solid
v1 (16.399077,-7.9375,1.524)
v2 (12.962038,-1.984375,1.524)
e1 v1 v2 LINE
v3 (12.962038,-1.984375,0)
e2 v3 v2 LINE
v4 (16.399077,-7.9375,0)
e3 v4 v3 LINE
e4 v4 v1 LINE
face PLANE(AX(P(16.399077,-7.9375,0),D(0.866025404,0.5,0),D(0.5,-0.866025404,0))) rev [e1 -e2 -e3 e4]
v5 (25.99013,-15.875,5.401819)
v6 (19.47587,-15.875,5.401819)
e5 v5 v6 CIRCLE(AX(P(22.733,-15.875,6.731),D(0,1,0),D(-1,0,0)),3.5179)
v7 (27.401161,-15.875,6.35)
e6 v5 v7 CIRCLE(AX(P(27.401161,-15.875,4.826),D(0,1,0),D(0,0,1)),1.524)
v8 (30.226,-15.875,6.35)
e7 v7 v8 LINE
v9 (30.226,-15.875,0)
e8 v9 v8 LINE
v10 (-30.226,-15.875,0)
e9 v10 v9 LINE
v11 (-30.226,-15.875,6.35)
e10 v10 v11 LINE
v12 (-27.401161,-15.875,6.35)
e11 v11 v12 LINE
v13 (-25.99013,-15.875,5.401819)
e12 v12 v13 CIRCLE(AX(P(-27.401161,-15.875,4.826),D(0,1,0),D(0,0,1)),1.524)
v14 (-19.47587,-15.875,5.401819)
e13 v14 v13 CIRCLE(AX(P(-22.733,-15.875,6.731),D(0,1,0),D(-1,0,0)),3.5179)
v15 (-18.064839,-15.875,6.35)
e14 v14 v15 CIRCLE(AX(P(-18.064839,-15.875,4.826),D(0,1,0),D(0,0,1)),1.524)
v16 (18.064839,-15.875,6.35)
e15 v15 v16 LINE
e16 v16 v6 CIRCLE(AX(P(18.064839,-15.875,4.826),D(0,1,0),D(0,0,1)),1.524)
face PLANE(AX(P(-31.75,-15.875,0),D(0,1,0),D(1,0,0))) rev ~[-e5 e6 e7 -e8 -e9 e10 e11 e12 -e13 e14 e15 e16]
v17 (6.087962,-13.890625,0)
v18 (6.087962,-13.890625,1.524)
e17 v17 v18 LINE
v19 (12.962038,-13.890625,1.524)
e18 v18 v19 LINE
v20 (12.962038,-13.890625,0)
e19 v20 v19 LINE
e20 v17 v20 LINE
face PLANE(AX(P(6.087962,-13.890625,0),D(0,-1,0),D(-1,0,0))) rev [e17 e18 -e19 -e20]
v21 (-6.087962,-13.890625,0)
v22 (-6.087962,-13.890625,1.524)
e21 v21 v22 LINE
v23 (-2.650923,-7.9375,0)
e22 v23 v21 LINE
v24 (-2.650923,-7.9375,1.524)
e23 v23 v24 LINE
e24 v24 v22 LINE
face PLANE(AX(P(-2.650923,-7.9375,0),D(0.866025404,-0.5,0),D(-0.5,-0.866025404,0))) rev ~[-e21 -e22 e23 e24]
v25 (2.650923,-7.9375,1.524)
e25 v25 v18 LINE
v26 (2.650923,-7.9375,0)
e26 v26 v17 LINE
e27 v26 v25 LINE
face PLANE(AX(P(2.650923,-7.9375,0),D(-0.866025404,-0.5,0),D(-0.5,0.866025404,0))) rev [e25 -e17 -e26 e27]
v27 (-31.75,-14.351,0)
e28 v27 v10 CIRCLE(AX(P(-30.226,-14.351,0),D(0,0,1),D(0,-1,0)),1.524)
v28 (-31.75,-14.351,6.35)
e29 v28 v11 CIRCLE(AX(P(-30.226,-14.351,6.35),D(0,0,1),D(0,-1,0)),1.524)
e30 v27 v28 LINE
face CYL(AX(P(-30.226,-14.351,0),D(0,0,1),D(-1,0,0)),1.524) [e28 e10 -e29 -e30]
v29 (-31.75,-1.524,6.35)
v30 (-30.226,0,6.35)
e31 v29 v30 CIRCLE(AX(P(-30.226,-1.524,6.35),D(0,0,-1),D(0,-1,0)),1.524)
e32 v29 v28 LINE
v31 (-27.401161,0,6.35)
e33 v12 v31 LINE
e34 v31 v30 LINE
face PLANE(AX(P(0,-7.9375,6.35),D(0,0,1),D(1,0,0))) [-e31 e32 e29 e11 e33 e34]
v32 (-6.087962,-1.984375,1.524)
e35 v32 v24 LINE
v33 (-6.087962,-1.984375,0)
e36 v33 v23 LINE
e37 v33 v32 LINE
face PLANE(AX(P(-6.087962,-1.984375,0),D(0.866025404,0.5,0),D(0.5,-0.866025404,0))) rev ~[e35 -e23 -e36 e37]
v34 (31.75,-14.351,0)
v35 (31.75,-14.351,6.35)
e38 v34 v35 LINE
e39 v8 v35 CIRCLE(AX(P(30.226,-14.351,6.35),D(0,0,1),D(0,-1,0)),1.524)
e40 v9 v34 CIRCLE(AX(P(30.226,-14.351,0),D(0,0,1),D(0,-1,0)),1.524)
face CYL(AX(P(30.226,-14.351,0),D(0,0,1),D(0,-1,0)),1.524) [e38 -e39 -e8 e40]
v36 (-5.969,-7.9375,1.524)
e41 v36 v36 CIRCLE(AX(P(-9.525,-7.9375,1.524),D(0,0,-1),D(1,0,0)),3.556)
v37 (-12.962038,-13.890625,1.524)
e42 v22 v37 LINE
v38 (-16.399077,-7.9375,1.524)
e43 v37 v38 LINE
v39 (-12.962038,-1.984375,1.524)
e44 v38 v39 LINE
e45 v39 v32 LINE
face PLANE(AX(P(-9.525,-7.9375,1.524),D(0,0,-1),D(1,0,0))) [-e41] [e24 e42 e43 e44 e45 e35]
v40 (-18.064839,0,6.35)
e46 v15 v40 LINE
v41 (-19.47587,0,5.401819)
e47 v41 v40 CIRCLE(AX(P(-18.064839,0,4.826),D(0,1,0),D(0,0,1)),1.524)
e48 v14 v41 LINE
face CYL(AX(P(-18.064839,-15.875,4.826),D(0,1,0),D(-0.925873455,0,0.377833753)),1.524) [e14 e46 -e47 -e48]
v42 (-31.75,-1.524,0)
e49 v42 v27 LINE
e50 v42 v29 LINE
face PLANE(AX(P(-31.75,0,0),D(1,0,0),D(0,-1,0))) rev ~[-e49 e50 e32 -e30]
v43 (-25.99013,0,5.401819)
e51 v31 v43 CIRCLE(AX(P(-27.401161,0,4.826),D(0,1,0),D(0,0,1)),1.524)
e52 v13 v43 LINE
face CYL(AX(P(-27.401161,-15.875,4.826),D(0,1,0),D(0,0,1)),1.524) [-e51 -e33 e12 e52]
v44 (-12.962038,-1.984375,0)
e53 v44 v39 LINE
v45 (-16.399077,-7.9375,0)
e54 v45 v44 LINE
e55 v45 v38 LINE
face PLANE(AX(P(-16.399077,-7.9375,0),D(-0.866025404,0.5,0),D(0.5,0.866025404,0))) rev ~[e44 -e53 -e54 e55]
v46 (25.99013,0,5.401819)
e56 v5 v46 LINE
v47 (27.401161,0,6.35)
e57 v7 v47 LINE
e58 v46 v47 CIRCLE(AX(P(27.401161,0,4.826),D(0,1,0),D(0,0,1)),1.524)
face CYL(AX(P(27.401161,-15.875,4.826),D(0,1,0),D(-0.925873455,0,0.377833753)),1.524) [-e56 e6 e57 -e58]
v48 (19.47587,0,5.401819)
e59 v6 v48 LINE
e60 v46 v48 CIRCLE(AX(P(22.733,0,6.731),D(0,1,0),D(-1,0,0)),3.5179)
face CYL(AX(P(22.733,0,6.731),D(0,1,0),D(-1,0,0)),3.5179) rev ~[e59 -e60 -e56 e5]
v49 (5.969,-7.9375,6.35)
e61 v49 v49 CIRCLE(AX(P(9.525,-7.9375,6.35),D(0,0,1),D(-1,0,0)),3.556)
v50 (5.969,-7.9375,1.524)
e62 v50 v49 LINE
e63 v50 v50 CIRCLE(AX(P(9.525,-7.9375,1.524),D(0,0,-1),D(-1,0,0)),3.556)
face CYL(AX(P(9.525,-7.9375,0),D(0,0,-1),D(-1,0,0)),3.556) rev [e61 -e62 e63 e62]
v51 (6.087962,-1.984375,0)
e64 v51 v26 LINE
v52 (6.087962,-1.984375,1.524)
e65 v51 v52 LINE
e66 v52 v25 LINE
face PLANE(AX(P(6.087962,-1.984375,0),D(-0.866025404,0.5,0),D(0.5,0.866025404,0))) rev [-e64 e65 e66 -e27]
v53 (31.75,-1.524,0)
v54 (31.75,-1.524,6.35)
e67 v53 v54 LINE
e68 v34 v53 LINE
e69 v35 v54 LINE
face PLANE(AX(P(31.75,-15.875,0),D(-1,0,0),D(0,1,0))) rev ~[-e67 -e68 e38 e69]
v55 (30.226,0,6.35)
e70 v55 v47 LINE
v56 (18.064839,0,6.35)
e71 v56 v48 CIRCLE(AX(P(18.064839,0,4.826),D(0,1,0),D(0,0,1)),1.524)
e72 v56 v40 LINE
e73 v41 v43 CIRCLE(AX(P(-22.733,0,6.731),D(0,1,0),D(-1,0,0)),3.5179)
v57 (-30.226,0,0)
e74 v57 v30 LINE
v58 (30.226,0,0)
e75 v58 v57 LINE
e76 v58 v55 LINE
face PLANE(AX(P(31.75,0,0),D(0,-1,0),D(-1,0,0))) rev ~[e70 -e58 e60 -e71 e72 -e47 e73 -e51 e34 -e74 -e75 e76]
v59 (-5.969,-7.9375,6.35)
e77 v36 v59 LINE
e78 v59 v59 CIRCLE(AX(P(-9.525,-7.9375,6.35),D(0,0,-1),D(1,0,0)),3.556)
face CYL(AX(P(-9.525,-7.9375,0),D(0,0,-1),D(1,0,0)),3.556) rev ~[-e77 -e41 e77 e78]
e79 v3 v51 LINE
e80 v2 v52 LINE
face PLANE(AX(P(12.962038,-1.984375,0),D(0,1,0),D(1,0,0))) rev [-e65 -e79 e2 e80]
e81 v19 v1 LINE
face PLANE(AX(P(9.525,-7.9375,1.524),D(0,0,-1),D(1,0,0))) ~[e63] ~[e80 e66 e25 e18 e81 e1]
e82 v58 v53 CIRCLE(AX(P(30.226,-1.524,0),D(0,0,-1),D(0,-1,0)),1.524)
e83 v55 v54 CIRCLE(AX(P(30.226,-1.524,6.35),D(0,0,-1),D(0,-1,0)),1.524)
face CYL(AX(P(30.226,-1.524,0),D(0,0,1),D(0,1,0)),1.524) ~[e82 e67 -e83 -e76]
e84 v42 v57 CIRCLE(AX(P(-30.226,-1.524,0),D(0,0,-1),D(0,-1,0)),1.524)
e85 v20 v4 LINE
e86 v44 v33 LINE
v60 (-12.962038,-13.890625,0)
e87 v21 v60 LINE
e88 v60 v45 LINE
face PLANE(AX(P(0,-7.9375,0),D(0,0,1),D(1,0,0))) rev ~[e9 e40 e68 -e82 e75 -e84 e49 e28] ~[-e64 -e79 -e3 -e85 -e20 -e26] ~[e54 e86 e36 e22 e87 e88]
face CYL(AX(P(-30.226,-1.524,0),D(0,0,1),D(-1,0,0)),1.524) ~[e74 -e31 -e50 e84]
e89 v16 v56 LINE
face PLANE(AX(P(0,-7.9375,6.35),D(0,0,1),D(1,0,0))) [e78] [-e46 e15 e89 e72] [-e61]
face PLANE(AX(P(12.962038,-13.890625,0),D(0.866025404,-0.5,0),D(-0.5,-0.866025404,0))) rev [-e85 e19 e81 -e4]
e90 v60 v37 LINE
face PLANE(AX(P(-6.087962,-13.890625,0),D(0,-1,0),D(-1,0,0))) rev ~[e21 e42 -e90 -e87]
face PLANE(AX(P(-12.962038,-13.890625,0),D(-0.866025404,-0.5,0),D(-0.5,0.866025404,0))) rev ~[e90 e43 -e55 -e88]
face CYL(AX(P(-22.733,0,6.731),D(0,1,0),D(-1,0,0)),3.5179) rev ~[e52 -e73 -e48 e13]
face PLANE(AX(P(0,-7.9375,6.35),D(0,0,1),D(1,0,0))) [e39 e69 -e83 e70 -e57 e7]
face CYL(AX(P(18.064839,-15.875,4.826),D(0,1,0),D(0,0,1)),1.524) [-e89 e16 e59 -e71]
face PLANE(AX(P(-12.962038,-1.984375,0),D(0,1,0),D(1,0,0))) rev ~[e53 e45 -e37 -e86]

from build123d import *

# Parameters (mm, degrees)
F1_DEPTH = 6.35
F2_R     = 3.5179
F3_DEPTH = 15.876
F4_R     = 1.524
F5_R     = 3.556
F6_DEPTH = 6.35
F8_DEPTH = 1.524


# Not quite as in the source:
# - a pattern or mirror of a feature is missing from the dataset's text; its kind, count and spacing are read off the source's solid


with BuildPart() as f1:
    # F0 (on Top) → F1 (new body)
    with BuildSketch(Plane.XY):
        Polygon((0, 0), (-31.75, 0), (-31.75, -15.875), (0, -15.875), (31.75, -15.875), (31.75, 0), align=None)
    extrude(amount=F1_DEPTH)

    # F2 (on face) → F3 (cut, through all)
    with BuildSketch(Plane(origin=(0, 0, 0), x_dir=(-1, 0, 0), z_dir=(0, 1, 0))):
        with Locations((-22.733, 6.731)):
            Circle(F2_R)
        with Locations((22.733, 6.731)):
            Circle(F2_R)
    extrude(amount=-F3_DEPTH, mode=Mode.SUBTRACT)

    # F4
    f4_edges = [f1.edges().sort_by_distance(p)[0] for p in [
        (31.75, 0, 3.175),
        (31.75, -15.875, 3.175),
        (-31.75, 0, 3.175),
        (-31.75, -15.875, 3.175),
        (19.235793, -7.9375, 6.35),
        (26.230207, -7.9375, 6.35),
        (-26.230207, -7.9375, 6.35),
        (-19.235793, -7.9375, 6.35),
    ]]
    fillet(f4_edges, radius=F4_R)

    # F5 (on face) → F6 (cut, through all)
    with BuildSketch(Plane(origin=(0, 0, 0), x_dir=(1, 0, 0), z_dir=(0, 0, -1))):
        with Locations((-9.525, 7.9375)):
            Circle(F5_R)
    f6 = extrude(amount=-F6_DEPTH, mode=Mode.SUBTRACT)

    # F6_copies: F6 across plane
    add(f6.mirror(Plane(origin=(0, 0, 0), x_dir=(0, 0, 1), z_dir=(1, 0, 0))), mode=Mode.SUBTRACT)

    # F7 (on face) → F8 (cut)
    with BuildSketch(Plane(origin=(0, 0, 0), x_dir=(1, 0, 0), z_dir=(0, 0, -1))):
        Polygon((-9.525, 1.984375), (-6.0879616787, 1.984375), (-2.6509233575, 7.9375), (-6.0879616787, 13.890625), (-9.525, 13.890625), (-12.9620383213, 13.890625), (-16.3990766425, 7.9375), (-12.9620383213, 1.984375), align=None)
    f8 = extrude(amount=-F8_DEPTH, mode=Mode.SUBTRACT)

    # F8_copies: F8 across plane
    add(f8.mirror(Plane(origin=(0, 0, 0), x_dir=(0, 0, 1), z_dir=(1, 0, 0))), mode=Mode.SUBTRACT)


solid = f1.part
